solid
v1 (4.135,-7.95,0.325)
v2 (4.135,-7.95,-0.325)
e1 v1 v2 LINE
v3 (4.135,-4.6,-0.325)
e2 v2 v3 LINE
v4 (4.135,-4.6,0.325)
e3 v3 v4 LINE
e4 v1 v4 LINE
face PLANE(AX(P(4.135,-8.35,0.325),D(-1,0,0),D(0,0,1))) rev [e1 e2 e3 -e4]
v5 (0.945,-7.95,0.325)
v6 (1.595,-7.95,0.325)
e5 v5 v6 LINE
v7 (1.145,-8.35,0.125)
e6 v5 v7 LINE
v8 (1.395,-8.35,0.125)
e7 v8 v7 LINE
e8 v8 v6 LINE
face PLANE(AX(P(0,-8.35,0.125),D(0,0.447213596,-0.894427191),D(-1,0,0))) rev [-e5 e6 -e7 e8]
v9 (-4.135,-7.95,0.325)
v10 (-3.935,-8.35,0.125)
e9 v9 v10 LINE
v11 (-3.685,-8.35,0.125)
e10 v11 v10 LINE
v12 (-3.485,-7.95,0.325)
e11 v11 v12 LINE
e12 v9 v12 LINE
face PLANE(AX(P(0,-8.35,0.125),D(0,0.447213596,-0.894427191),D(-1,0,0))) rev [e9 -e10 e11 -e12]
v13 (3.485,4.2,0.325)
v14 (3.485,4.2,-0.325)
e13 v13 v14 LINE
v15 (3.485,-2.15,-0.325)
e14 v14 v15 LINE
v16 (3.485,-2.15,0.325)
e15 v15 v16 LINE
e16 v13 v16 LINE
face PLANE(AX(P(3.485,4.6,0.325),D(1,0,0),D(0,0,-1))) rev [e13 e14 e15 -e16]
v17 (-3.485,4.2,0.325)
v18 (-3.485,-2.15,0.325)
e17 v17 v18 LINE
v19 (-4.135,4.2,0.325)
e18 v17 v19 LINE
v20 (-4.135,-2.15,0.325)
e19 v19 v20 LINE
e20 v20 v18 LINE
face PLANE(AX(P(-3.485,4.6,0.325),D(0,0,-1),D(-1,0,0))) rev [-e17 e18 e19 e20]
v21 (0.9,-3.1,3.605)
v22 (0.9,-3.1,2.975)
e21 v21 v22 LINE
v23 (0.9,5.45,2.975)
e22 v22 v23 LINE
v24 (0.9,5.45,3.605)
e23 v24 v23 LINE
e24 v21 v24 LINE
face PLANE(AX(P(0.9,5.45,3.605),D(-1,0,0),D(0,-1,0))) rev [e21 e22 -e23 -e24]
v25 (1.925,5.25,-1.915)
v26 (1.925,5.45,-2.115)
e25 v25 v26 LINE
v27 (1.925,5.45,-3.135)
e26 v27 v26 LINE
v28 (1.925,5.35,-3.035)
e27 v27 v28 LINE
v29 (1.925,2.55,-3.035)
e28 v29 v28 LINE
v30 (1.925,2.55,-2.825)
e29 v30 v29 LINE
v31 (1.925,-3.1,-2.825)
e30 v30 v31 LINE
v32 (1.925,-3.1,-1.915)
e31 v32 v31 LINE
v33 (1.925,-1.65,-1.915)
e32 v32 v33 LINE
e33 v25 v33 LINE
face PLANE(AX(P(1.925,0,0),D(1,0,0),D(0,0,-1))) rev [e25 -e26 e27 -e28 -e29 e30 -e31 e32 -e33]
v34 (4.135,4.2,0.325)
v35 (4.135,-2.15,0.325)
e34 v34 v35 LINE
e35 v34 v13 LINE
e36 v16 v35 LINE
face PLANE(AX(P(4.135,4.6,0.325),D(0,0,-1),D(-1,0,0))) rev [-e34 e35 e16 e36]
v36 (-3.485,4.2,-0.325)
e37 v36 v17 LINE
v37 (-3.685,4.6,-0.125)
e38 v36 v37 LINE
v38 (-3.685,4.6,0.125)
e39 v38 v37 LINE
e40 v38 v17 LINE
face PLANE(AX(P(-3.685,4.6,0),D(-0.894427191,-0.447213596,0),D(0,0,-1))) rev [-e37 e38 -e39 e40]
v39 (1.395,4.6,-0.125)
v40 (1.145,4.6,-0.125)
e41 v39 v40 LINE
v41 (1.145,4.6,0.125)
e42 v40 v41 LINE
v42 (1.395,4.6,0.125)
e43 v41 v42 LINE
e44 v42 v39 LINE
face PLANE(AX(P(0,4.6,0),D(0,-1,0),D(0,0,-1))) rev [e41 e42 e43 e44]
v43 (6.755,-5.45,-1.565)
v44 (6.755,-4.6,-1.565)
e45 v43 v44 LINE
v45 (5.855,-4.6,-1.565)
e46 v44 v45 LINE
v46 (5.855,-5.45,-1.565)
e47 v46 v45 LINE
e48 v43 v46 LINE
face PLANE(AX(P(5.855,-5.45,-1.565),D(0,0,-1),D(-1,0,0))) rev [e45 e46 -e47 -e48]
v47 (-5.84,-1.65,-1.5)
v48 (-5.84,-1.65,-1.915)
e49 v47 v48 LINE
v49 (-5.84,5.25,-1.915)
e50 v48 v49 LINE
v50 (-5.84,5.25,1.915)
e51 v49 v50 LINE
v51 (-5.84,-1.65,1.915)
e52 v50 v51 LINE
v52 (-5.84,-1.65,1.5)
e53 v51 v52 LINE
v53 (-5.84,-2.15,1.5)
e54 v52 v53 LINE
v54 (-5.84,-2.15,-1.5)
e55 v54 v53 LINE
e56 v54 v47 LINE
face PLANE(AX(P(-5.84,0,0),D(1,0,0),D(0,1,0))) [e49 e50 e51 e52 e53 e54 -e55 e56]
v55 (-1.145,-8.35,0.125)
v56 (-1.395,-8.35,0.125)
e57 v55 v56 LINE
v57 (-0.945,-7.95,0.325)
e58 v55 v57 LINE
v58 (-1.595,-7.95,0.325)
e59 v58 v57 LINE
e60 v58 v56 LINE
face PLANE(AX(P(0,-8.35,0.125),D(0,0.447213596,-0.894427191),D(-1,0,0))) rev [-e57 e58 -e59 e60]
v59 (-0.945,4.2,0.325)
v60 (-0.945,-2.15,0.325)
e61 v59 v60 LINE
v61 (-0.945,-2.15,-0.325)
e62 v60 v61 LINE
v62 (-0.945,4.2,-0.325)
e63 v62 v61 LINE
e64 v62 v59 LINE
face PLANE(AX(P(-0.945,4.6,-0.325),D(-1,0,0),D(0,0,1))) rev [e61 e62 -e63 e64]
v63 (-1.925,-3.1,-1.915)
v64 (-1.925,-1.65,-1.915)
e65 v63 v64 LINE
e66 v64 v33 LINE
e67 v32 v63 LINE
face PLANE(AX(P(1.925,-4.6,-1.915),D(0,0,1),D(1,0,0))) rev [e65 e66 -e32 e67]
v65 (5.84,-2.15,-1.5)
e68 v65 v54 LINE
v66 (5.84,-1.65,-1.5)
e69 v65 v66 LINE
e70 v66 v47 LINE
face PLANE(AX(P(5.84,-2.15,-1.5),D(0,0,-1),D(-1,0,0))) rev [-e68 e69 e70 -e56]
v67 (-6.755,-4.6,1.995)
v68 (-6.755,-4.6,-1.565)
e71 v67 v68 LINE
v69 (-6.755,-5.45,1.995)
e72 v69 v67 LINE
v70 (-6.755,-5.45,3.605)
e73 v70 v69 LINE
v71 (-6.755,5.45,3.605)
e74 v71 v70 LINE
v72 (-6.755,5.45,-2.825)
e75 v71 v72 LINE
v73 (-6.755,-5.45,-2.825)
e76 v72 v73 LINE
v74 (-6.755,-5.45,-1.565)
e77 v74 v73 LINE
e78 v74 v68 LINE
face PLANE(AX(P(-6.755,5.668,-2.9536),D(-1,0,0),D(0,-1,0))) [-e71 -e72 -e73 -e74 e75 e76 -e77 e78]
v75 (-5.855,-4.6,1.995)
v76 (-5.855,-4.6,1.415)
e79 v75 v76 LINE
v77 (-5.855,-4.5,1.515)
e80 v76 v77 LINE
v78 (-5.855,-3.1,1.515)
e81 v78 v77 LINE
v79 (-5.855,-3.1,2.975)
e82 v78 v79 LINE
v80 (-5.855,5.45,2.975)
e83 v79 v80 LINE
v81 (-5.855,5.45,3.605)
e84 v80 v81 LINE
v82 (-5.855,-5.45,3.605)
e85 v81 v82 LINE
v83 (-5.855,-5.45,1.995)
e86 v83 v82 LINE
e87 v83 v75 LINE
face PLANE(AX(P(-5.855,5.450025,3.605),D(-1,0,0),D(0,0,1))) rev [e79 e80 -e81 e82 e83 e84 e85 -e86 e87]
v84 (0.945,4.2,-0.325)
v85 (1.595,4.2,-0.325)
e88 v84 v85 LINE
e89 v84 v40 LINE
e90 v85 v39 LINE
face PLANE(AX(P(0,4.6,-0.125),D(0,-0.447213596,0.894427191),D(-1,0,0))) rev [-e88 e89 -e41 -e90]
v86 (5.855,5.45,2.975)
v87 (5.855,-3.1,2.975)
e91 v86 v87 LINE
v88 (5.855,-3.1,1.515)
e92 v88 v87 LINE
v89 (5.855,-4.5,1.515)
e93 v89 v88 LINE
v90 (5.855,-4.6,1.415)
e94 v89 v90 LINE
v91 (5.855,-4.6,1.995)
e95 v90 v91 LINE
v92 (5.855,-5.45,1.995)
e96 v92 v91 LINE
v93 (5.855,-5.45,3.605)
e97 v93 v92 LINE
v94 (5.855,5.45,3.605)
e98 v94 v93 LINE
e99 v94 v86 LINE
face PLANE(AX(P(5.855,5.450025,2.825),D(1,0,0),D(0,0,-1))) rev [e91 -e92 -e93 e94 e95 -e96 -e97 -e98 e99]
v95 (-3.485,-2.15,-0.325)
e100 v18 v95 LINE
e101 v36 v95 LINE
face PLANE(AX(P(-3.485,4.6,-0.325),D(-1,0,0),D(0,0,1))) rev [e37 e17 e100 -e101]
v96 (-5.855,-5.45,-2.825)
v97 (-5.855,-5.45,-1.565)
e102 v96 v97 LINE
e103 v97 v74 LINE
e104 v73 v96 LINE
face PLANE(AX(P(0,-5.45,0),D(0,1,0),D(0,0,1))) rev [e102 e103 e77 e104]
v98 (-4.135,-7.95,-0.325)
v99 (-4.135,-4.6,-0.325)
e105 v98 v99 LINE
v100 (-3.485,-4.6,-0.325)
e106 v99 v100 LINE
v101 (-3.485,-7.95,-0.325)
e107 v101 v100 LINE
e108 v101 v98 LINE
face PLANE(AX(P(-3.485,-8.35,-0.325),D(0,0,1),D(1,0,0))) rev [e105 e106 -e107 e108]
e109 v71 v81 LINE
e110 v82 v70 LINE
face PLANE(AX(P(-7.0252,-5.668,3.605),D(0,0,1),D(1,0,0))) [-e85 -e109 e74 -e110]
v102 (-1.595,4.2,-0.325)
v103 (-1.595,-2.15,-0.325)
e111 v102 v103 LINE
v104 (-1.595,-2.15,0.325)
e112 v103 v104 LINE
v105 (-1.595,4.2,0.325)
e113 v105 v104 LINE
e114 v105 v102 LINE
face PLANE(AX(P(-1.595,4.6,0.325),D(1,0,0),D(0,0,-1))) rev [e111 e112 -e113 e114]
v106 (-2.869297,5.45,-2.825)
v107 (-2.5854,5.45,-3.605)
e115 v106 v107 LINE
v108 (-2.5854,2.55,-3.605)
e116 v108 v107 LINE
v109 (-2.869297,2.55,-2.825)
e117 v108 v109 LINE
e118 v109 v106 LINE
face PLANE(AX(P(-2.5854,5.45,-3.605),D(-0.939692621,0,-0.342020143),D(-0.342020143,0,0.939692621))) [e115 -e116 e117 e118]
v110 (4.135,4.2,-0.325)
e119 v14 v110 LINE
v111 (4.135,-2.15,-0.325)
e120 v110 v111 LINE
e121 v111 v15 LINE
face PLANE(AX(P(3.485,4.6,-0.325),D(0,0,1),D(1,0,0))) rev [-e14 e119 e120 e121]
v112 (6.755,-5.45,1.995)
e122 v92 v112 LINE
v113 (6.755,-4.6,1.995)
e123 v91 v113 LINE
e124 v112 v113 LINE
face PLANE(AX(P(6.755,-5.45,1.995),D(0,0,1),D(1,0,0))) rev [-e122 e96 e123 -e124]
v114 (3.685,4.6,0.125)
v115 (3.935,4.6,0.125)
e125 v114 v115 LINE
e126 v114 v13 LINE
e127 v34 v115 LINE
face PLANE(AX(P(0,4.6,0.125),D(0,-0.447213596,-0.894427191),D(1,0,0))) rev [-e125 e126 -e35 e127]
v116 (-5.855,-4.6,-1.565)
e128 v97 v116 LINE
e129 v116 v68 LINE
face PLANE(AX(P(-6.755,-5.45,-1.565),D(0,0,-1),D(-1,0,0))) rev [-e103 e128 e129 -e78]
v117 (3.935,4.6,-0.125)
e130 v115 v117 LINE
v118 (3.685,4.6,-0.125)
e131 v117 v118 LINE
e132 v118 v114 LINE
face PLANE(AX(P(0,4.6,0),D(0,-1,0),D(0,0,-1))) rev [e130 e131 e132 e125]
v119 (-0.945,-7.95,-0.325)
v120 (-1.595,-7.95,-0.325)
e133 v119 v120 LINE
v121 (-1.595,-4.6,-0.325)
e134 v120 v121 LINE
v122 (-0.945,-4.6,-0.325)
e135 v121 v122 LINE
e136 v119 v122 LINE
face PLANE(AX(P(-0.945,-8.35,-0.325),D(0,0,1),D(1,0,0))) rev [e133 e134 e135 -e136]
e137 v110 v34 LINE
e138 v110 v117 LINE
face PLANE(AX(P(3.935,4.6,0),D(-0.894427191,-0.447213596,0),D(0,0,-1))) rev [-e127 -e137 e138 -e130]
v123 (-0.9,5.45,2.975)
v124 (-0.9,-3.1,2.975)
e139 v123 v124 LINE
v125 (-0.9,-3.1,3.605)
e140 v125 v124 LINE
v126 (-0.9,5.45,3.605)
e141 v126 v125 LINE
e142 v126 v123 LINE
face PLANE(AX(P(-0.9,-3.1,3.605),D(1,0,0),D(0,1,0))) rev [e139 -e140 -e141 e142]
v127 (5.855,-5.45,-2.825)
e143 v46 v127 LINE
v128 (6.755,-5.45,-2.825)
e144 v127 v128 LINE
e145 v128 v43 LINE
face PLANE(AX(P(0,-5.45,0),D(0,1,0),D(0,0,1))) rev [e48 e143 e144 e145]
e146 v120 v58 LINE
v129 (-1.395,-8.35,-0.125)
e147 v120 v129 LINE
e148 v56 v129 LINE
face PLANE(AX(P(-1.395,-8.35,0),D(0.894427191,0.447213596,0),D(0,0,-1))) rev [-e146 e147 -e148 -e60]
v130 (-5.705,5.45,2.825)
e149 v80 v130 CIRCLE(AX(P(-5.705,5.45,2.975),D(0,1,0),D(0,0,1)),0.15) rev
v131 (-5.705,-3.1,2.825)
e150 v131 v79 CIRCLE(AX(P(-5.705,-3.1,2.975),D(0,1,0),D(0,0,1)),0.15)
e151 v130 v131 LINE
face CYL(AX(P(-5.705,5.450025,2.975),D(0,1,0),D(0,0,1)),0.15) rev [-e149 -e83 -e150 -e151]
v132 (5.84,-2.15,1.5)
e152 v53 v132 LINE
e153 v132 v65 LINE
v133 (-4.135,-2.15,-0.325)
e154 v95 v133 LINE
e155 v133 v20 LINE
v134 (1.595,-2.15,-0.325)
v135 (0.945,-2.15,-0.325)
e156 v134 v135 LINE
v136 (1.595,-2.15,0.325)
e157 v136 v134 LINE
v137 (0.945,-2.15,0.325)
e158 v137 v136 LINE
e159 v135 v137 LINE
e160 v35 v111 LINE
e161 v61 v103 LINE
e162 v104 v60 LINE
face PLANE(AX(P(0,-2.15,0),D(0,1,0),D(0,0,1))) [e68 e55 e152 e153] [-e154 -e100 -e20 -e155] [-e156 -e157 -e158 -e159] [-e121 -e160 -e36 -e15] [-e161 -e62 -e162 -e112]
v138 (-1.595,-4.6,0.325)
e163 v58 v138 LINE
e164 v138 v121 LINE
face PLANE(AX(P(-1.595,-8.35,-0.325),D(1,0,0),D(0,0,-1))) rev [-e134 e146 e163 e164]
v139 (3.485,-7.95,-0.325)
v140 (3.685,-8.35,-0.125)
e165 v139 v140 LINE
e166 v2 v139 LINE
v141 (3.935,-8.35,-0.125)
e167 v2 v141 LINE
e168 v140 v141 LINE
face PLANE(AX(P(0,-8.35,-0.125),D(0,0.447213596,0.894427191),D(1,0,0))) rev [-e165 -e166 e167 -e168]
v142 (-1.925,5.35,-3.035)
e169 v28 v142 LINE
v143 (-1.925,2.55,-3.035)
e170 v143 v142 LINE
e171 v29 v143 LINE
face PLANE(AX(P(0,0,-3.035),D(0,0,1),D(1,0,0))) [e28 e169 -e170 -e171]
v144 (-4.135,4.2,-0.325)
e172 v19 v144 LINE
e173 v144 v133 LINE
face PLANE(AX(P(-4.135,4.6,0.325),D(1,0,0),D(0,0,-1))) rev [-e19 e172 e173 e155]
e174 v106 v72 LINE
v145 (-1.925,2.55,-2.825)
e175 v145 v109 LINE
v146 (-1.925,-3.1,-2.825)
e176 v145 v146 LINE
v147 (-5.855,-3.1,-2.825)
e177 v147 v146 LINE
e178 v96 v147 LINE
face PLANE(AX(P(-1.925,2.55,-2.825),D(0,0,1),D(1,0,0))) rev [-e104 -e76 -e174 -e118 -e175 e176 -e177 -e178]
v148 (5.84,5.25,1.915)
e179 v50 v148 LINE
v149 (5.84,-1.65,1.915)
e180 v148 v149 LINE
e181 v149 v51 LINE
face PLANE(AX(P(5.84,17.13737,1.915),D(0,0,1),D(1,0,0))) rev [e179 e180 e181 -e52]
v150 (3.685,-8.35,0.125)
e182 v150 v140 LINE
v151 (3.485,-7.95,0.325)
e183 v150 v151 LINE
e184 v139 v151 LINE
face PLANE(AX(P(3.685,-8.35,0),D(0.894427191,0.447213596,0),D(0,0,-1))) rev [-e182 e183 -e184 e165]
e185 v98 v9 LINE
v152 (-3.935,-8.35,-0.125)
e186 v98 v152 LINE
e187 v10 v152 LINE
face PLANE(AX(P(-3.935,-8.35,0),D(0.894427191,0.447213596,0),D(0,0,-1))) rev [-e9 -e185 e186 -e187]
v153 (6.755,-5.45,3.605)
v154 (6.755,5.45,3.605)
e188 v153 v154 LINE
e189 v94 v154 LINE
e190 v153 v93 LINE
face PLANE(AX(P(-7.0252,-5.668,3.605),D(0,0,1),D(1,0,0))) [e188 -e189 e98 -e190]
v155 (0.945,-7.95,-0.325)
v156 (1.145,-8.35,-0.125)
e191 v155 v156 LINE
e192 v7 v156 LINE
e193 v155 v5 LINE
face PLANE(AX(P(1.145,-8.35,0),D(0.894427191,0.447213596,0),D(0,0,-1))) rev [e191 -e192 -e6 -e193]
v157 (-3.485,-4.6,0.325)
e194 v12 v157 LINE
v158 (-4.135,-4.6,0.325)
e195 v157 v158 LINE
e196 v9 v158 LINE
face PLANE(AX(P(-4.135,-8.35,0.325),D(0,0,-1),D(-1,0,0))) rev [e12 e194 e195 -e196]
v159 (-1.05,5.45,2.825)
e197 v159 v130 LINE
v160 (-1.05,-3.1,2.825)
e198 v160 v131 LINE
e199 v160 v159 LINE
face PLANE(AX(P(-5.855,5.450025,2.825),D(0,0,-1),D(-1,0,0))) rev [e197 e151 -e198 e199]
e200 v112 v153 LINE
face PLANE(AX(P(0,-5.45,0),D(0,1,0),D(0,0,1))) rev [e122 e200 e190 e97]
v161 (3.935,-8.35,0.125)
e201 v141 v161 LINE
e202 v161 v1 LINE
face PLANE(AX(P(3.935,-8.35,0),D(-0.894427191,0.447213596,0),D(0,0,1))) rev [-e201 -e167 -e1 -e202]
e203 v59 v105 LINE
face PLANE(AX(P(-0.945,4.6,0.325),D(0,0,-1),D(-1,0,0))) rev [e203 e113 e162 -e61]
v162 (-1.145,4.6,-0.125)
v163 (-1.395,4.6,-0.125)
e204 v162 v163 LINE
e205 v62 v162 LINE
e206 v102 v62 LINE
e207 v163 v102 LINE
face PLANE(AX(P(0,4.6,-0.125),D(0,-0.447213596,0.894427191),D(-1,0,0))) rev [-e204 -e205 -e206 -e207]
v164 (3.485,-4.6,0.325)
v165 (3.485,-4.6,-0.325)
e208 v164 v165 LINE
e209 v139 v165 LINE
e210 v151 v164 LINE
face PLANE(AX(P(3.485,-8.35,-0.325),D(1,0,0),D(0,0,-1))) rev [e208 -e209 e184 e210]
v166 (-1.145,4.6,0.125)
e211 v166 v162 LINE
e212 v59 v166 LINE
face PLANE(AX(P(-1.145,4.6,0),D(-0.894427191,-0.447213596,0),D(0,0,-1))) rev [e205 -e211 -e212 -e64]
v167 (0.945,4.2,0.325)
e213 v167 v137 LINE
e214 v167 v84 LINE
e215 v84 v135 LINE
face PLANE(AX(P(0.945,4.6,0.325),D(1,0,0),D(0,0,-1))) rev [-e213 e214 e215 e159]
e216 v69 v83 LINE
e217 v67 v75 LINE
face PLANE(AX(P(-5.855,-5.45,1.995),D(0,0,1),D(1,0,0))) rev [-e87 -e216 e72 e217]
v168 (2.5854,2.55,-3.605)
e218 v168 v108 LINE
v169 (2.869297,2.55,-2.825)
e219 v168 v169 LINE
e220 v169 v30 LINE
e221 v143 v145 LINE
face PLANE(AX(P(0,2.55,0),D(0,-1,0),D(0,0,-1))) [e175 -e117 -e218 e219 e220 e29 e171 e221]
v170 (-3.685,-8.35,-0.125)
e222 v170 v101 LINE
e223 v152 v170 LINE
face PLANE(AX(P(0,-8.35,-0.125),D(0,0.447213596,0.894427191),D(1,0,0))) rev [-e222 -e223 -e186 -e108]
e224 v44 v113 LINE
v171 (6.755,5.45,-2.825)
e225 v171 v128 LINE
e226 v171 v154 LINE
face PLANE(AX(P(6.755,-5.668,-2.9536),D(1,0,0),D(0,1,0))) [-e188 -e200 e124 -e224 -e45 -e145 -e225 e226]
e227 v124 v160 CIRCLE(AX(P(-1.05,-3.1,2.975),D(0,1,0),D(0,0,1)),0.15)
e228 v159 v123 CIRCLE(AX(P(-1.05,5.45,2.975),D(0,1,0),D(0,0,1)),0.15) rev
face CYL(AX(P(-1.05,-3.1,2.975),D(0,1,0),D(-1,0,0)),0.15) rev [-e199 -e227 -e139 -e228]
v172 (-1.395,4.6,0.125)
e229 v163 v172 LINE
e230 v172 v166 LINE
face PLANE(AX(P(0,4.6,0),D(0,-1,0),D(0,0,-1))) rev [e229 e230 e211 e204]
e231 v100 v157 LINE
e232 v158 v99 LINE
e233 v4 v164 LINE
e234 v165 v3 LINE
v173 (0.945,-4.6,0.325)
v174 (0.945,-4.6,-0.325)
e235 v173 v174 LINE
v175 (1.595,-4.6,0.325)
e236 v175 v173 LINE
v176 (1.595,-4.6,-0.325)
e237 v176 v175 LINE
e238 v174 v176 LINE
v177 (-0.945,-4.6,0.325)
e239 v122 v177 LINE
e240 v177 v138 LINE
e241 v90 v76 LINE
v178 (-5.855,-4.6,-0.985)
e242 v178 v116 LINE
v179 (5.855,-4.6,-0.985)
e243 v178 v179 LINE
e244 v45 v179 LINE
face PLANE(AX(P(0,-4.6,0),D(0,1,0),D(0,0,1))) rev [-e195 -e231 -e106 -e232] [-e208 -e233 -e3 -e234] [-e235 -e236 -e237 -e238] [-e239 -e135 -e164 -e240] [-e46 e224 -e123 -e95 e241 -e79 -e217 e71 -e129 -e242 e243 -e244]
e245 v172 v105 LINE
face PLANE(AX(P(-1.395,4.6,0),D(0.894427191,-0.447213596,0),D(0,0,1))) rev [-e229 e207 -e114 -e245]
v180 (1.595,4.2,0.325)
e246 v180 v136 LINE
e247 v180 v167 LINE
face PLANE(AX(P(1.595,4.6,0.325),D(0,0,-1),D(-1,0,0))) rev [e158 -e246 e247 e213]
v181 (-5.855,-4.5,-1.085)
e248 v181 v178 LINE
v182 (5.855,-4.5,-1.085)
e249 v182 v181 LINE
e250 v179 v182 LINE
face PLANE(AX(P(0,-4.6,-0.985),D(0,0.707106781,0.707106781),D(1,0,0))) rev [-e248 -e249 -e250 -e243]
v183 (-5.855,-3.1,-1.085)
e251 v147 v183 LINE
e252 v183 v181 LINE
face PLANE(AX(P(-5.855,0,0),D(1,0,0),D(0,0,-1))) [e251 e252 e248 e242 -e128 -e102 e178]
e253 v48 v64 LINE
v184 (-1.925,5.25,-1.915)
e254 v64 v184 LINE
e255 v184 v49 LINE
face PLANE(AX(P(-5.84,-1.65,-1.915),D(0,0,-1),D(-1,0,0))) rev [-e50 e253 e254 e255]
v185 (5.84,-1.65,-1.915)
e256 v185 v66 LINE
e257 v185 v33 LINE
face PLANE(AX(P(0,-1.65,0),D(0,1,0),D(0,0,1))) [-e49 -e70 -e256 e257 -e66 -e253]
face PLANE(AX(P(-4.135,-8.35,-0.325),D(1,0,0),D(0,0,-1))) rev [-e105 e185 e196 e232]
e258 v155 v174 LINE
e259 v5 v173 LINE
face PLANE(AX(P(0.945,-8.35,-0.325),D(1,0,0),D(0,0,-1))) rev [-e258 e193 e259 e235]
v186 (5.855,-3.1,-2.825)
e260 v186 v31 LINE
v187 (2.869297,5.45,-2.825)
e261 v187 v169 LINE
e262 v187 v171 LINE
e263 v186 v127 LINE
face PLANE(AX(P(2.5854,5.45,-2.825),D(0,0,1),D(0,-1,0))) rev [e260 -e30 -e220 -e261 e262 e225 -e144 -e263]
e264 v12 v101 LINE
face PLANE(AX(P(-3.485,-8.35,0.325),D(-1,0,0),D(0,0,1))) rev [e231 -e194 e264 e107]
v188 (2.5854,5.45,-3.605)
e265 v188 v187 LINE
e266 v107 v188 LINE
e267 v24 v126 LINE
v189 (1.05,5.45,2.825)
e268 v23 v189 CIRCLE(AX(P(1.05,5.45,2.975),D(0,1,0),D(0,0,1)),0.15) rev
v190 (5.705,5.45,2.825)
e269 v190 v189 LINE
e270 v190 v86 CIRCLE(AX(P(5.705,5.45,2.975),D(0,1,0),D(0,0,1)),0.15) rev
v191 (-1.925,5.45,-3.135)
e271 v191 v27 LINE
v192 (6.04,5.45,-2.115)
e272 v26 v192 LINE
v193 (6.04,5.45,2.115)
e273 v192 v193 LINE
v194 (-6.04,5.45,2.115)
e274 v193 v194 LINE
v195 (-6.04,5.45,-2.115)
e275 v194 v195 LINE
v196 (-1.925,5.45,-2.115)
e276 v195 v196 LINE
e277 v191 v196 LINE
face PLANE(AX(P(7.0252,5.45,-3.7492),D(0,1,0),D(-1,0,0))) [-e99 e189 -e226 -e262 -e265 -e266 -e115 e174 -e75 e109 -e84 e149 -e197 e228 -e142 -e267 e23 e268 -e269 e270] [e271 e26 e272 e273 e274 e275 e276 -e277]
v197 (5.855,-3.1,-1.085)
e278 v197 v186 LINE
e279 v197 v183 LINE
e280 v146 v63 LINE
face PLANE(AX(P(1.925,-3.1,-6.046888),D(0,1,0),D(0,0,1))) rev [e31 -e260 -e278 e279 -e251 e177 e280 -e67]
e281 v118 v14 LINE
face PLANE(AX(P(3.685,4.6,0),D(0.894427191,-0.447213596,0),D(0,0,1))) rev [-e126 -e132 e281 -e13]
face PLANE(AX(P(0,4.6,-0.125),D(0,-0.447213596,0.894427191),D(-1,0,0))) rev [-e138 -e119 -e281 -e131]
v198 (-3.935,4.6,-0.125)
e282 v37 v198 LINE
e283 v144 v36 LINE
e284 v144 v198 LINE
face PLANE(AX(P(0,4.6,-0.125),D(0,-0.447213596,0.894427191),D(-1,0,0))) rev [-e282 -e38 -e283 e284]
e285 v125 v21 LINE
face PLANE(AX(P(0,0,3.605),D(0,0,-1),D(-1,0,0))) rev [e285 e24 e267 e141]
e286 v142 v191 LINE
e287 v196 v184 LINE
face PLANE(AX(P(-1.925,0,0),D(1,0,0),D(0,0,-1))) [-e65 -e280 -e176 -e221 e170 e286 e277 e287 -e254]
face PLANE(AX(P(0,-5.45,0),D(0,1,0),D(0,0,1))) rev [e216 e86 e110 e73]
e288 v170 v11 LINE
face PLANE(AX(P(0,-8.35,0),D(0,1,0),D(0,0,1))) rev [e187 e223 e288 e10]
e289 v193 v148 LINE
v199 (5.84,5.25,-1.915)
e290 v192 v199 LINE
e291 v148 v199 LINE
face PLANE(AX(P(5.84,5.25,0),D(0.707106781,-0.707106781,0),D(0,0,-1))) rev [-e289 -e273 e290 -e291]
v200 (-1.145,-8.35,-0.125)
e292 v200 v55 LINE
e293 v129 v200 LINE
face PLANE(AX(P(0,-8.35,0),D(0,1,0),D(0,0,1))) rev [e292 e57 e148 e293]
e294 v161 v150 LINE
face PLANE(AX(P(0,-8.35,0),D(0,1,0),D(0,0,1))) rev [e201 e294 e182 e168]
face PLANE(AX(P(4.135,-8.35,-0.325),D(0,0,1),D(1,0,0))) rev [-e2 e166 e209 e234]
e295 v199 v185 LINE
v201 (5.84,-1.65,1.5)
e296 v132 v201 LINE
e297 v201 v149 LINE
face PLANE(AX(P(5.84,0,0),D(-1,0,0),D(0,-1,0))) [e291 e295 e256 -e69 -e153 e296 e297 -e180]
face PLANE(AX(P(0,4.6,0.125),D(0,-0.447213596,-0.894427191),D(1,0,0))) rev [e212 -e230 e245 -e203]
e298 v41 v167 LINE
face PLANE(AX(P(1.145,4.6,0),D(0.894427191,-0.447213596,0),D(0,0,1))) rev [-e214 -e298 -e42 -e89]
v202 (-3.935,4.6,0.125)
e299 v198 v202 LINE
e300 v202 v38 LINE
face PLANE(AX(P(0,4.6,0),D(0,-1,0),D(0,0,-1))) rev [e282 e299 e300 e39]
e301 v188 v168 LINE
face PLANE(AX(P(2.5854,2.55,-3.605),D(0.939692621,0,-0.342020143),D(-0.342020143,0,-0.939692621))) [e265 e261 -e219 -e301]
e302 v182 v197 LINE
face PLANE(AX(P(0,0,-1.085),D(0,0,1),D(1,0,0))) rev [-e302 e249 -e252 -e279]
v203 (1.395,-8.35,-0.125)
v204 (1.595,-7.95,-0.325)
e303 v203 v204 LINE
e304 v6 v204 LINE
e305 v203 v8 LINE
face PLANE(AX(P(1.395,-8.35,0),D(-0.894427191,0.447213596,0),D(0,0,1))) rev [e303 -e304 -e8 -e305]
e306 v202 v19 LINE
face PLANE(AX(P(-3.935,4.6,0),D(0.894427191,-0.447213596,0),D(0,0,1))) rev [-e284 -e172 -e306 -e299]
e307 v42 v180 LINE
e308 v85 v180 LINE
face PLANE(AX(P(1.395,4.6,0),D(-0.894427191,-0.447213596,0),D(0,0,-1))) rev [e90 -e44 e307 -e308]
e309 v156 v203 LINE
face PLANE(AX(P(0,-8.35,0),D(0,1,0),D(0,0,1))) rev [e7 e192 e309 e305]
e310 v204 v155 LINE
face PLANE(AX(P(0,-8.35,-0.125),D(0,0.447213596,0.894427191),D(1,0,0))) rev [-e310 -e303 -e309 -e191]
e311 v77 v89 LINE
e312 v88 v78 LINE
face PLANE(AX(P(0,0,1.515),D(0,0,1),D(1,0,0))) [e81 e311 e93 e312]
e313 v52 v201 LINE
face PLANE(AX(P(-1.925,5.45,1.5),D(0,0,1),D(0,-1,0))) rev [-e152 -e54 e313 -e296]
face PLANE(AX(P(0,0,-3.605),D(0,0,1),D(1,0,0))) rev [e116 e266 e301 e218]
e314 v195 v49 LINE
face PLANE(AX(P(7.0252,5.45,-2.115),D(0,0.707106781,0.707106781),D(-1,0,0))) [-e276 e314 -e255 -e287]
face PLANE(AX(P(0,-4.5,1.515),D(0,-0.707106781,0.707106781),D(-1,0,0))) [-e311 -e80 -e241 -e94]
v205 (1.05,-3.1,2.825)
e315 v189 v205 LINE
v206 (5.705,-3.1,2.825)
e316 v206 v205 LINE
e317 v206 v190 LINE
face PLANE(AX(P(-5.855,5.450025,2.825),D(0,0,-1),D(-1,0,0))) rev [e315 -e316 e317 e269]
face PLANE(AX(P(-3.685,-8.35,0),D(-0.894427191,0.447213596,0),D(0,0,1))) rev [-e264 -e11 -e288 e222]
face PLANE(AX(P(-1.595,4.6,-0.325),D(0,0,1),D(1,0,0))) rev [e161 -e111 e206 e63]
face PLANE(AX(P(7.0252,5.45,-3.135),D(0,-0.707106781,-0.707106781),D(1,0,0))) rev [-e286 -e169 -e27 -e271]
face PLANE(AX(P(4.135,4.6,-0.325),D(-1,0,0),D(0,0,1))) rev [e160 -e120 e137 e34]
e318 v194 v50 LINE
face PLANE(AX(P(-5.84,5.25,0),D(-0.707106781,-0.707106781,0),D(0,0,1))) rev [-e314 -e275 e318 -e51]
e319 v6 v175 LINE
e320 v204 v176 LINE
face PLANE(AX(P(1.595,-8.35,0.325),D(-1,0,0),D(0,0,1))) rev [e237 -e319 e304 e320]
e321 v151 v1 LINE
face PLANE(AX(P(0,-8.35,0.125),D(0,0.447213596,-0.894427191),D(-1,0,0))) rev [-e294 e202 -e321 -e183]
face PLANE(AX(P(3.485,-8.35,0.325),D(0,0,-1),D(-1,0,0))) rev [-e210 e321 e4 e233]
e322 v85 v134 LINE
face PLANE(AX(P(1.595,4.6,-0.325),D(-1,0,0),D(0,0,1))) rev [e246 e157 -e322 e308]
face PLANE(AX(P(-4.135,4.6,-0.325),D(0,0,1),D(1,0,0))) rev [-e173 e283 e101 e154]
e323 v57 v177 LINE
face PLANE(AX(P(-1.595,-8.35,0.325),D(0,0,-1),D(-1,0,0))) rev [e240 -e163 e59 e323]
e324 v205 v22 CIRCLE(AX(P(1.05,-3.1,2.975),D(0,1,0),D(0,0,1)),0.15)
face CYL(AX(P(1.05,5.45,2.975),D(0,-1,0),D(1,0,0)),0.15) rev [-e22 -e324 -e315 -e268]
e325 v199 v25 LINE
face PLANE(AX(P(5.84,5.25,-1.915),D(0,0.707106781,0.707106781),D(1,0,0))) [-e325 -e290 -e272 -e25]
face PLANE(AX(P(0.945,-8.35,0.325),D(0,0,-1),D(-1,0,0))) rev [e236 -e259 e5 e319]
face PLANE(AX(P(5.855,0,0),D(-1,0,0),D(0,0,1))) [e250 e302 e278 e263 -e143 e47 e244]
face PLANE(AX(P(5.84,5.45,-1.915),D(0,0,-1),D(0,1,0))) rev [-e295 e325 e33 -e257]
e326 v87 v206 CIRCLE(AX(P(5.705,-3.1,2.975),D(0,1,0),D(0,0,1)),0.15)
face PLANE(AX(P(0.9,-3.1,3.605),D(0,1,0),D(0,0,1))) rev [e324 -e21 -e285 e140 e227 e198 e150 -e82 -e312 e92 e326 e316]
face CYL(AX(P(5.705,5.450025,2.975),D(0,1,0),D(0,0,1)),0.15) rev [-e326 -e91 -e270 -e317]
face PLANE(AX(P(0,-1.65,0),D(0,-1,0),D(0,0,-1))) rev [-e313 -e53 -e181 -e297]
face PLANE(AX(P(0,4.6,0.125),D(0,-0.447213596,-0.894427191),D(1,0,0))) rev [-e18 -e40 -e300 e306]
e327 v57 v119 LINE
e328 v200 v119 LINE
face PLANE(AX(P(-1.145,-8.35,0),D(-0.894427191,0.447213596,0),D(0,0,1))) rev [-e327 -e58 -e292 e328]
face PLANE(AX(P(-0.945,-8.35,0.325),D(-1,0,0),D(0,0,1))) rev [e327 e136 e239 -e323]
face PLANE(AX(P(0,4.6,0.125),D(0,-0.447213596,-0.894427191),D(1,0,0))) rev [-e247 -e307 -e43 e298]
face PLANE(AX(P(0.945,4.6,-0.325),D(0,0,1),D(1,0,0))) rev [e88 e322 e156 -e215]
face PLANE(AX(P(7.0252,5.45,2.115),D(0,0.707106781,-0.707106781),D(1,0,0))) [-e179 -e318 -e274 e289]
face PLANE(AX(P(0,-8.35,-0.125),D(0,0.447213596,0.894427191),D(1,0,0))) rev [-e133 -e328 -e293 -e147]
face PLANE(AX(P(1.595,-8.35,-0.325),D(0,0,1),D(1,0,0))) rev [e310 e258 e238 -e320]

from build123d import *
from OCP.BRepFilletAPI import BRepFilletAPI_MakeChamfer

# Parameters (mm, degrees)
CUT_EXTRUDE1_START       = -8.68
CUT_EXTRUDE1_OUTLINE_W   = 6.64
CUT_EXTRUDE1_OUTLINE_H   = 7.1
CUT_EXTRUDE1_DEPTH       = 4.83
CUT_EXTRUDE1_2_OUTLINE_W = 6.64
CUT_EXTRUDE1_2_OUTLINE_H = 7.1
CUT_EXTRUDE1_2_DEPTH     = 4.83
CUT_EXTRUDE1_START_2     = -3.85
CUT_EXTRUDE1_3_OUTLINE_W = 2.105
CUT_EXTRUDE1_3_OUTLINE_H = 7.1
CUT_EXTRUDE1_3_DEPTH     = 3.85
BOSS_EXTRUDE1_DEPTH      = 2.95
SKETCH3_W                = 3.415
SKETCH3_H                = 7.1
CUT_EXTRUDE2_DEPTH       = 3.915
SKETCH4_W                = 3.415
SKETCH4_H                = 7.1
CUT_EXTRUDE3_DEPTH       = 3.915
SKETCH5_W                = 0.21
SKETCH5_H                = 10.05
CUT_EXTRUDE4_DEPTH       = 4.1696
SKETCH6_W                = 4.83
SKETCH6_H                = 0.21
SKETCH6_W_2              = 0.6604
CUT_EXTRUDE5_DEPTH       = 7.15
SKETCH7_W                = 0.21
SKETCH7_H                = 2.9
CUT_EXTRUDE6_DEPTH       = 4.1696
SKETCH8_W                = 5.1708
SKETCH8_H                = 2.9
BOSS_EXTRUDE2_DEPTH      = 0.57
SKETCH9_W                = 11.71
SKETCH9_H                = 0.78
CUT_EXTRUDE7_DEPTH       = 13.634419259
SKETCH10_W               = 1.8
SKETCH10_H               = 8.55
BOSS_EXTRUDE3_DEPTH      = 0.78
SKETCH11_W               = 11.71
SKETCH11_H               = 1.5
CUT_EXTRUDE8_DEPTH       = 1.31
SKETCH12_W               = 0.9
SKETCH12_H               = 1.61
BOSS_EXTRUDE4_DEPTH      = 0.85
SKETCH13_W               = 0.9
SKETCH13_H               = 1.61
BOSS_EXTRUDE5_DEPTH      = 0.85
CUT_EXTRUDE9_REACH       = 11.866
SKETCH15_W               = 3.85
SKETCH15_H               = 1.5
SKETCH16_W               = 1.74
SKETCH16_H               = 1.5
CUT_EXTRUDE10_DEPTH      = 3.93
SKETCH17_W               = 0.9
SKETCH17_H               = 1.26
BOSS_EXTRUDE6_DEPTH      = 0.85
SKETCH18_W               = 1.74
SKETCH18_H               = 1.5
CUT_EXTRUDE11_DEPTH      = 3.93
SKETCH19_W               = 0.9
SKETCH19_H               = 1.26
BOSS_EXTRUDE7_DEPTH      = 0.85
SKETCH20_W               = 11.68
SKETCH20_H               = 3
CUT_EXTRUDE12_DEPTH      = 0.5
CUT_EXTRUDE13_REACH      = 12.442
SKETCH22_W               = 11.68
SKETCH22_H               = 0.415
SKETCH23_W               = 0.65
SKETCH23_H               = 0.65
BOSS_EXTRUDE8_DEPTH      = 6.75
SKETCH24_W               = 0.65
SKETCH24_H               = 0.65
BOSS_EXTRUDE9_DEPTH      = 6.75
SKETCH25_W               = 0.65
SKETCH25_H               = 0.65
BOSS_EXTRUDE10_DEPTH     = 6.75
SKETCH26_W               = 0.65
SKETCH26_H               = 0.65
BOSS_EXTRUDE11_DEPTH     = 6.75
SKETCH27_W               = 0.65
SKETCH27_H               = 0.65
BOSS_EXTRUDE12_DEPTH     = 3.75
SKETCH28_W               = 0.65
SKETCH28_H               = 0.65
BOSS_EXTRUDE13_DEPTH     = 3.75
SKETCH29_W               = 0.65
SKETCH29_H               = 0.65
BOSS_EXTRUDE14_DEPTH     = 3.75
SKETCH30_W               = 0.65
SKETCH30_H               = 0.65
BOSS_EXTRUDE15_DEPTH     = 3.75
DRAFT1_ANGLE             = 20
CHAMFER1_SIZE            = 0.1
CHAMFER2_SIZE            = 0.2
CHAMFER2_SIZE2           = 0.4
CHAMFER3_SIZE            = 0.2
FILLET1_R                = 0.15


with BuildPart() as part:
    # Cut-Extrude1: read off the stored shape, not the designer's step
    # Cut-Extrude1 outline → Cut-Extrude1 (new body)
    with BuildSketch(Plane(origin=(1.925, 0, 0), x_dir=(0, 0, -1), z_dir=(1, 0, 0)).offset(CUT_EXTRUDE1_START)):
        with Locations((-0.285, 1.9)):
            Rectangle(CUT_EXTRUDE1_OUTLINE_W, CUT_EXTRUDE1_OUTLINE_H)
    extrude(amount=CUT_EXTRUDE1_DEPTH)



with BuildPart() as body_2:
    # Cut-Extrude1 2 outline → Cut-Extrude1 2 (new body)
    with BuildSketch(Plane(origin=(1.925, 0, 0), x_dir=(0, 0, -1), z_dir=(1, 0, 0))):
        with Locations((-0.285, 1.9)):
            Rectangle(CUT_EXTRUDE1_2_OUTLINE_W, CUT_EXTRUDE1_2_OUTLINE_H)
    extrude(amount=CUT_EXTRUDE1_2_DEPTH)


with BuildPart() as part_1:
    add(part.part)

    add(body_2.part)  # Cut-Extrude1 3 merges body 2
    # Cut-Extrude1 3 outline → Cut-Extrude1 3 (add)
    with BuildSketch(Plane(origin=(1.925, 0, 0), x_dir=(0, 0, -1), z_dir=(1, 0, 0)).offset(CUT_EXTRUDE1_START_2)):
        with Locations((-2.5525, 1.9)):
            Rectangle(CUT_EXTRUDE1_3_OUTLINE_W, CUT_EXTRUDE1_3_OUTLINE_H)
    extrude(amount=CUT_EXTRUDE1_3_DEPTH)

    # Sketch2 → Boss-Extrude1 (add)
    with BuildSketch(Plane.XZ.offset(1.65)):
        Polygon((6.755, -3.035), (1.925, -3.035), (1.925, -1.915), (-1.925, -1.915), (-1.925, -3.035), (-6.755, -3.035), (-6.755, 3.605), (6.755, 3.605), align=None)
    extrude(amount=BOSS_EXTRUDE1_DEPTH)

    # Sketch3 → Cut-Extrude2 (cut)
    with BuildSketch(Plane.ZY.offset(-1.925)):
        with Locations((-0.2075, 1.9)):
            Rectangle(SKETCH3_W, SKETCH3_H)
    extrude(amount=-CUT_EXTRUDE2_DEPTH, mode=Mode.SUBTRACT)

    # Sketch4 → Cut-Extrude3 (cut)
    with BuildSketch(Plane(origin=(-1.925, 0, 0), x_dir=(0, 0, -1), z_dir=(1, 0, 0))):
        with Locations((0.2075, 1.9)):
            Rectangle(SKETCH4_W, SKETCH4_H)
    extrude(amount=-CUT_EXTRUDE3_DEPTH, mode=Mode.SUBTRACT)

    # Sketch5 → Cut-Extrude4 (cut)
    with BuildSketch(Plane(origin=(6.755, 0, 0), x_dir=(0, 0, -1), z_dir=(1, 0, 0))):
        with Locations((2.93, 0.425)):
            Rectangle(SKETCH5_W, SKETCH5_H)
    extrude(amount=-CUT_EXTRUDE4_DEPTH, mode=Mode.SUBTRACT)

    # Sketch6 → Cut-Extrude5 (cut)
    with BuildSketch(Plane.XZ.offset(4.6)):
        with Locations((-4.34, -2.93)):
            Rectangle(SKETCH6_W, SKETCH6_H)
        with Locations((2.2552, -2.93)):
            Rectangle(SKETCH6_W_2, SKETCH6_H)
    extrude(amount=-CUT_EXTRUDE5_DEPTH, mode=Mode.SUBTRACT)

    # Sketch7 → Cut-Extrude6 (cut)
    with BuildSketch(Plane.ZY.offset(6.755)):
        with Locations((-2.93, 4)):
            Rectangle(SKETCH7_W, SKETCH7_H)
    extrude(amount=-CUT_EXTRUDE6_DEPTH, mode=Mode.SUBTRACT)

    # Sketch8 → Boss-Extrude2 (add)
    with BuildSketch(Plane(origin=(0, 0, -3.035), x_dir=(-1, 0, 0), z_dir=(0, 0, -1))):
        with Locations((0, 4)):
            Rectangle(SKETCH8_W, SKETCH8_H)
    extrude(amount=BOSS_EXTRUDE2_DEPTH)

    # Sketch9 → Cut-Extrude7 (cut, through all)
    with BuildSketch(Plane.XZ.offset(4.6)):
        with Locations((0, 3.215)):
            Rectangle(SKETCH9_W, SKETCH9_H)
    extrude(amount=-CUT_EXTRUDE7_DEPTH, mode=Mode.SUBTRACT)

    # Sketch10 → Boss-Extrude3 (add)
    with BuildSketch(Plane.XY.offset(2.825)):
        with Locations((0, 1.175)):
            Rectangle(SKETCH10_W, SKETCH10_H)
    extrude(amount=BOSS_EXTRUDE3_DEPTH)

    # Sketch11 → Cut-Extrude8 (cut)
    with BuildSketch(Plane.XY.offset(2.825)):
        with Locations((0, -3.85)):
            Rectangle(SKETCH11_W, SKETCH11_H)
    extrude(amount=-CUT_EXTRUDE8_DEPTH, mode=Mode.SUBTRACT)

    # Sketch12 → Boss-Extrude4 (add)
    with BuildSketch(Plane.XZ.offset(4.6)):
        with Locations((6.305, 2.8)):
            Rectangle(SKETCH12_W, SKETCH12_H)
    extrude(amount=BOSS_EXTRUDE4_DEPTH)

    # Sketch13 → Boss-Extrude5 (add)
    with BuildSketch(Plane.XZ.offset(4.6)):
        with Locations((-6.305, 2.8)):
            Rectangle(SKETCH13_W, SKETCH13_H)
    extrude(amount=BOSS_EXTRUDE5_DEPTH)

    # Sketch15 → Cut-Extrude9 (cut, up to next)
    with BuildSketch(Plane.XY.offset(-1.085), mode=Mode.PRIVATE) as cut_extrude9_sk1:
        with Locations((0, -3.85)):
            Rectangle(SKETCH15_W, SKETCH15_H)
    cut_extrude9_tool1 = extrude(cut_extrude9_sk1.sketch, amount=-CUT_EXTRUDE9_REACH, mode=Mode.PRIVATE) & part_1.part
    add(cut_extrude9_tool1.solids().sort_by_distance((0, -3.85, -1.085))[0], mode=Mode.SUBTRACT)

    # Sketch16 → Cut-Extrude10 (cut)
    with BuildSketch(Plane.ZY.offset(-1.925)):
        with Locations((-1.955, -3.85)):
            Rectangle(SKETCH16_W, SKETCH16_H)
    extrude(amount=-CUT_EXTRUDE10_DEPTH, mode=Mode.SUBTRACT)

    # Sketch17 → Boss-Extrude6 (add)
    with BuildSketch(Plane.XZ.offset(4.6)):
        with Locations((6.305, -2.195)):
            Rectangle(SKETCH17_W, SKETCH17_H)
    extrude(amount=BOSS_EXTRUDE6_DEPTH)

    # Sketch18 → Cut-Extrude11 (cut)
    with BuildSketch(Plane(origin=(-1.925, 0, 0), x_dir=(0, 0, -1), z_dir=(1, 0, 0))):
        with Locations((1.955, -3.85)):
            Rectangle(SKETCH18_W, SKETCH18_H)
    extrude(amount=-CUT_EXTRUDE11_DEPTH, mode=Mode.SUBTRACT)

    # Sketch19 → Boss-Extrude7 (add)
    with BuildSketch(Plane.XZ.offset(4.6)):
        with Locations((-6.305, -2.195)):
            Rectangle(SKETCH19_W, SKETCH19_H)
    extrude(amount=BOSS_EXTRUDE7_DEPTH)

    # Sketch20 → Cut-Extrude12 (cut)
    with BuildSketch(Plane(origin=(0, -1.65, 0), x_dir=(-1, 0, 0), z_dir=(0, 1, 0))):
        Rectangle(SKETCH20_W, SKETCH20_H)
    extrude(amount=-CUT_EXTRUDE12_DEPTH, mode=Mode.SUBTRACT)

    # Sketch22 → Cut-Extrude13 (cut, up to next)
    with BuildSketch(Plane.XZ.offset(1.65), mode=Mode.PRIVATE) as cut_extrude13_sk1:
        with Locations((0, 1.7075)):
            Rectangle(SKETCH22_W, SKETCH22_H)
    cut_extrude13_tool1 = extrude(cut_extrude13_sk1.sketch, amount=-CUT_EXTRUDE13_REACH, mode=Mode.PRIVATE) & part_1.part
    add(cut_extrude13_tool1.solids().sort_by_distance((0, -1.65, 1.7075))[0], mode=Mode.SUBTRACT)

    # Sketch23 → Boss-Extrude8 (add)
    with BuildSketch(Plane(origin=(0, -2.15, 0), x_dir=(-1, 0, 0), z_dir=(0, 1, 0))):
        with Locations((3.81, 0)):
            Rectangle(SKETCH23_W, SKETCH23_H)
    extrude(amount=BOSS_EXTRUDE8_DEPTH)

    # Sketch24 → Boss-Extrude9 (add)
    with BuildSketch(Plane(origin=(0, -2.15, 0), x_dir=(-1, 0, 0), z_dir=(0, 1, 0))):
        with Locations((1.27, 0)):
            Rectangle(SKETCH24_W, SKETCH24_H)
    extrude(amount=BOSS_EXTRUDE9_DEPTH)

    # Sketch25 → Boss-Extrude10 (add)
    with BuildSketch(Plane(origin=(0, -2.15, 0), x_dir=(-1, 0, 0), z_dir=(0, 1, 0))):
        with Locations((-1.27, 0)):
            Rectangle(SKETCH25_W, SKETCH25_H)
    extrude(amount=BOSS_EXTRUDE10_DEPTH)

    # Sketch26 → Boss-Extrude11 (add)
    with BuildSketch(Plane(origin=(0, -2.15, 0), x_dir=(-1, 0, 0), z_dir=(0, 1, 0))):
        with Locations((-3.81, 0)):
            Rectangle(SKETCH26_W, SKETCH26_H)
    extrude(amount=BOSS_EXTRUDE11_DEPTH)

    # Sketch27 → Boss-Extrude12 (add)
    with BuildSketch(Plane.XZ.offset(4.6)):
        with Locations((-3.81, 0)):
            Rectangle(SKETCH27_W, SKETCH27_H)
    extrude(amount=BOSS_EXTRUDE12_DEPTH)

    # Sketch28 → Boss-Extrude13 (add)
    with BuildSketch(Plane.XZ.offset(4.6)):
        with Locations((-1.27, 0)):
            Rectangle(SKETCH28_W, SKETCH28_H)
    extrude(amount=BOSS_EXTRUDE13_DEPTH)

    # Sketch29 → Boss-Extrude14 (add)
    with BuildSketch(Plane.XZ.offset(4.6)):
        with Locations((1.27, 0)):
            Rectangle(SKETCH29_W, SKETCH29_H)
    extrude(amount=BOSS_EXTRUDE14_DEPTH)

    # Sketch30 → Boss-Extrude15 (add)
    with BuildSketch(Plane.XZ.offset(4.6)):
        with Locations((3.81, 0)):
            Rectangle(SKETCH30_W, SKETCH30_H)
    extrude(amount=BOSS_EXTRUDE15_DEPTH)

    # Draft1
    draft1_faces = [part_1.faces().sort_by_distance(p)[0] for p in [
        (-2.5854, 4, -3.215),
        (2.5854, 4, -3.215),
    ]]
    draft(draft1_faces, Plane(origin=(0, 0, -3.605), x_dir=(-1, 0, 0), z_dir=(0, 0, -1)), DRAFT1_ANGLE)

    # Chamfer1
    chamfer1_edges = [part_1.edges().sort_by_distance(p)[0] for p in [
        (0, 5.45, -3.035),
        (0, -4.6, 1.515),
        (0, -4.6, -1.085),
    ]]
    chamfer(chamfer1_edges, length=CHAMFER1_SIZE)

    # Chamfer2: one chamfer whose edges measure the first distance from different faces: ONE call of the kernel's chamfer builder (chamfer() names one face for all edges)
    chamfer2_edges_1 = [part_1.edges().sort_by_distance(p)[0] for p in [
        (-4.135, 4.6, 0),
        (-3.81, 4.6, 0.325),
        (-3.485, 4.6, 0),
        (-3.81, 4.6, -0.325),
    ]]
    chamfer2_side_1 = [part_1.faces().sort_by_distance(p)[0] for p in [
        (-3.81, 4.6, 0),
    ]]
    chamfer2_edges_2 = [part_1.edges().sort_by_distance(p)[0] for p in [
        (-1.27, 4.6, -0.325),
        (-1.595, 4.6, 0),
        (-1.27, 4.6, 0.325),
        (-0.945, 4.6, 0),
    ]]
    chamfer2_side_2 = [part_1.faces().sort_by_distance(p)[0] for p in [
        (-1.27, 4.6, 0),
    ]]
    chamfer2_edges_3 = [part_1.edges().sort_by_distance(p)[0] for p in [
        (0.945, 4.6, 0),
        (1.27, 4.6, 0.325),
        (1.595, 4.6, 0),
        (1.27, 4.6, -0.325),
    ]]
    chamfer2_side_3 = [part_1.faces().sort_by_distance(p)[0] for p in [
        (1.27, 4.6, 0),
    ]]
    chamfer2_edges_4 = [part_1.edges().sort_by_distance(p)[0] for p in [
        (3.81, 4.6, -0.325),
        (3.485, 4.6, 0),
        (3.81, 4.6, 0.325),
        (4.135, 4.6, 0),
    ]]
    chamfer2_side_4 = [part_1.faces().sort_by_distance(p)[0] for p in [
        (3.81, 4.6, 0),
    ]]
    chamfer2_edges_5 = [part_1.edges().sort_by_distance(p)[0] for p in [
        (-3.81, -8.35, -0.325),
        (-3.485, -8.35, 0),
        (-3.81, -8.35, 0.325),
        (-4.135, -8.35, 0),
    ]]
    chamfer2_side_5 = [part_1.faces().sort_by_distance(p)[0] for p in [
        (-3.81, -8.35, 0),
    ]]
    chamfer2_edges_6 = [part_1.edges().sort_by_distance(p)[0] for p in [
        (-1.27, -8.35, -0.325),
        (-0.945, -8.35, 0),
        (-1.27, -8.35, 0.325),
        (-1.595, -8.35, 0),
    ]]
    chamfer2_side_6 = [part_1.faces().sort_by_distance(p)[0] for p in [
        (-1.27, -8.35, 0),
    ]]
    chamfer2_edges_7 = [part_1.edges().sort_by_distance(p)[0] for p in [
        (1.27, -8.35, -0.325),
        (1.595, -8.35, 0),
        (1.27, -8.35, 0.325),
        (0.945, -8.35, 0),
    ]]
    chamfer2_side_7 = [part_1.faces().sort_by_distance(p)[0] for p in [
        (1.27, -8.35, 0),
    ]]
    chamfer2_edges_8 = [part_1.edges().sort_by_distance(p)[0] for p in [
        (4.135, -8.35, 0),
        (3.81, -8.35, 0.325),
        (3.485, -8.35, 0),
        (3.81, -8.35, -0.325),
    ]]
    chamfer2_side_8 = [part_1.faces().sort_by_distance(p)[0] for p in [
        (3.81, -8.35, 0),
    ]]
    chamfer2 = BRepFilletAPI_MakeChamfer(part_1.part.solid().wrapped)
    for e in chamfer2_edges_1:
        chamfer2.Add(CHAMFER2_SIZE, CHAMFER2_SIZE2, e.wrapped, chamfer2_side_1[0].wrapped)  # the first distance lies on this face
    for e in chamfer2_edges_2:
        chamfer2.Add(CHAMFER2_SIZE, CHAMFER2_SIZE2, e.wrapped, chamfer2_side_2[0].wrapped)  # the first distance lies on this face
    for e in chamfer2_edges_3:
        chamfer2.Add(CHAMFER2_SIZE, CHAMFER2_SIZE2, e.wrapped, chamfer2_side_3[0].wrapped)  # the first distance lies on this face
    for e in chamfer2_edges_4:
        chamfer2.Add(CHAMFER2_SIZE, CHAMFER2_SIZE2, e.wrapped, chamfer2_side_4[0].wrapped)  # the first distance lies on this face
    for e in chamfer2_edges_5:
        chamfer2.Add(CHAMFER2_SIZE, CHAMFER2_SIZE2, e.wrapped, chamfer2_side_5[0].wrapped)  # the first distance lies on this face
    for e in chamfer2_edges_6:
        chamfer2.Add(CHAMFER2_SIZE, CHAMFER2_SIZE2, e.wrapped, chamfer2_side_6[0].wrapped)  # the first distance lies on this face
    for e in chamfer2_edges_7:
        chamfer2.Add(CHAMFER2_SIZE, CHAMFER2_SIZE2, e.wrapped, chamfer2_side_7[0].wrapped)  # the first distance lies on this face
    for e in chamfer2_edges_8:
        chamfer2.Add(CHAMFER2_SIZE, CHAMFER2_SIZE2, e.wrapped, chamfer2_side_8[0].wrapped)  # the first distance lies on this face
    add(Compound.cast(chamfer2.Shape()), mode=Mode.REPLACE)

    # Chamfer3
    chamfer3_edges = [part_1.edges().sort_by_distance(p)[0] for p in [
        (5.84, 5.45, 0),
        (3.8825, 5.45, -1.915),
        (-5.84, 5.45, 0),
        (-3.8825, 5.45, -1.915),
        (0, 5.45, 1.915),
    ]]
    chamfer(chamfer3_edges, length=CHAMFER3_SIZE)

    # Fillet1
    fillet1_edges = [part_1.edges().sort_by_distance(p)[0] for p in [
        (5.855, 1.175, 2.825),
        (-5.855, 1.175, 2.825),
        (-0.9, 1.175, 2.825),
        (0.9, 1.175, 2.825),
    ]]
    fillet(fillet1_edges, radius=FILLET1_R)


solid = part_1.part
